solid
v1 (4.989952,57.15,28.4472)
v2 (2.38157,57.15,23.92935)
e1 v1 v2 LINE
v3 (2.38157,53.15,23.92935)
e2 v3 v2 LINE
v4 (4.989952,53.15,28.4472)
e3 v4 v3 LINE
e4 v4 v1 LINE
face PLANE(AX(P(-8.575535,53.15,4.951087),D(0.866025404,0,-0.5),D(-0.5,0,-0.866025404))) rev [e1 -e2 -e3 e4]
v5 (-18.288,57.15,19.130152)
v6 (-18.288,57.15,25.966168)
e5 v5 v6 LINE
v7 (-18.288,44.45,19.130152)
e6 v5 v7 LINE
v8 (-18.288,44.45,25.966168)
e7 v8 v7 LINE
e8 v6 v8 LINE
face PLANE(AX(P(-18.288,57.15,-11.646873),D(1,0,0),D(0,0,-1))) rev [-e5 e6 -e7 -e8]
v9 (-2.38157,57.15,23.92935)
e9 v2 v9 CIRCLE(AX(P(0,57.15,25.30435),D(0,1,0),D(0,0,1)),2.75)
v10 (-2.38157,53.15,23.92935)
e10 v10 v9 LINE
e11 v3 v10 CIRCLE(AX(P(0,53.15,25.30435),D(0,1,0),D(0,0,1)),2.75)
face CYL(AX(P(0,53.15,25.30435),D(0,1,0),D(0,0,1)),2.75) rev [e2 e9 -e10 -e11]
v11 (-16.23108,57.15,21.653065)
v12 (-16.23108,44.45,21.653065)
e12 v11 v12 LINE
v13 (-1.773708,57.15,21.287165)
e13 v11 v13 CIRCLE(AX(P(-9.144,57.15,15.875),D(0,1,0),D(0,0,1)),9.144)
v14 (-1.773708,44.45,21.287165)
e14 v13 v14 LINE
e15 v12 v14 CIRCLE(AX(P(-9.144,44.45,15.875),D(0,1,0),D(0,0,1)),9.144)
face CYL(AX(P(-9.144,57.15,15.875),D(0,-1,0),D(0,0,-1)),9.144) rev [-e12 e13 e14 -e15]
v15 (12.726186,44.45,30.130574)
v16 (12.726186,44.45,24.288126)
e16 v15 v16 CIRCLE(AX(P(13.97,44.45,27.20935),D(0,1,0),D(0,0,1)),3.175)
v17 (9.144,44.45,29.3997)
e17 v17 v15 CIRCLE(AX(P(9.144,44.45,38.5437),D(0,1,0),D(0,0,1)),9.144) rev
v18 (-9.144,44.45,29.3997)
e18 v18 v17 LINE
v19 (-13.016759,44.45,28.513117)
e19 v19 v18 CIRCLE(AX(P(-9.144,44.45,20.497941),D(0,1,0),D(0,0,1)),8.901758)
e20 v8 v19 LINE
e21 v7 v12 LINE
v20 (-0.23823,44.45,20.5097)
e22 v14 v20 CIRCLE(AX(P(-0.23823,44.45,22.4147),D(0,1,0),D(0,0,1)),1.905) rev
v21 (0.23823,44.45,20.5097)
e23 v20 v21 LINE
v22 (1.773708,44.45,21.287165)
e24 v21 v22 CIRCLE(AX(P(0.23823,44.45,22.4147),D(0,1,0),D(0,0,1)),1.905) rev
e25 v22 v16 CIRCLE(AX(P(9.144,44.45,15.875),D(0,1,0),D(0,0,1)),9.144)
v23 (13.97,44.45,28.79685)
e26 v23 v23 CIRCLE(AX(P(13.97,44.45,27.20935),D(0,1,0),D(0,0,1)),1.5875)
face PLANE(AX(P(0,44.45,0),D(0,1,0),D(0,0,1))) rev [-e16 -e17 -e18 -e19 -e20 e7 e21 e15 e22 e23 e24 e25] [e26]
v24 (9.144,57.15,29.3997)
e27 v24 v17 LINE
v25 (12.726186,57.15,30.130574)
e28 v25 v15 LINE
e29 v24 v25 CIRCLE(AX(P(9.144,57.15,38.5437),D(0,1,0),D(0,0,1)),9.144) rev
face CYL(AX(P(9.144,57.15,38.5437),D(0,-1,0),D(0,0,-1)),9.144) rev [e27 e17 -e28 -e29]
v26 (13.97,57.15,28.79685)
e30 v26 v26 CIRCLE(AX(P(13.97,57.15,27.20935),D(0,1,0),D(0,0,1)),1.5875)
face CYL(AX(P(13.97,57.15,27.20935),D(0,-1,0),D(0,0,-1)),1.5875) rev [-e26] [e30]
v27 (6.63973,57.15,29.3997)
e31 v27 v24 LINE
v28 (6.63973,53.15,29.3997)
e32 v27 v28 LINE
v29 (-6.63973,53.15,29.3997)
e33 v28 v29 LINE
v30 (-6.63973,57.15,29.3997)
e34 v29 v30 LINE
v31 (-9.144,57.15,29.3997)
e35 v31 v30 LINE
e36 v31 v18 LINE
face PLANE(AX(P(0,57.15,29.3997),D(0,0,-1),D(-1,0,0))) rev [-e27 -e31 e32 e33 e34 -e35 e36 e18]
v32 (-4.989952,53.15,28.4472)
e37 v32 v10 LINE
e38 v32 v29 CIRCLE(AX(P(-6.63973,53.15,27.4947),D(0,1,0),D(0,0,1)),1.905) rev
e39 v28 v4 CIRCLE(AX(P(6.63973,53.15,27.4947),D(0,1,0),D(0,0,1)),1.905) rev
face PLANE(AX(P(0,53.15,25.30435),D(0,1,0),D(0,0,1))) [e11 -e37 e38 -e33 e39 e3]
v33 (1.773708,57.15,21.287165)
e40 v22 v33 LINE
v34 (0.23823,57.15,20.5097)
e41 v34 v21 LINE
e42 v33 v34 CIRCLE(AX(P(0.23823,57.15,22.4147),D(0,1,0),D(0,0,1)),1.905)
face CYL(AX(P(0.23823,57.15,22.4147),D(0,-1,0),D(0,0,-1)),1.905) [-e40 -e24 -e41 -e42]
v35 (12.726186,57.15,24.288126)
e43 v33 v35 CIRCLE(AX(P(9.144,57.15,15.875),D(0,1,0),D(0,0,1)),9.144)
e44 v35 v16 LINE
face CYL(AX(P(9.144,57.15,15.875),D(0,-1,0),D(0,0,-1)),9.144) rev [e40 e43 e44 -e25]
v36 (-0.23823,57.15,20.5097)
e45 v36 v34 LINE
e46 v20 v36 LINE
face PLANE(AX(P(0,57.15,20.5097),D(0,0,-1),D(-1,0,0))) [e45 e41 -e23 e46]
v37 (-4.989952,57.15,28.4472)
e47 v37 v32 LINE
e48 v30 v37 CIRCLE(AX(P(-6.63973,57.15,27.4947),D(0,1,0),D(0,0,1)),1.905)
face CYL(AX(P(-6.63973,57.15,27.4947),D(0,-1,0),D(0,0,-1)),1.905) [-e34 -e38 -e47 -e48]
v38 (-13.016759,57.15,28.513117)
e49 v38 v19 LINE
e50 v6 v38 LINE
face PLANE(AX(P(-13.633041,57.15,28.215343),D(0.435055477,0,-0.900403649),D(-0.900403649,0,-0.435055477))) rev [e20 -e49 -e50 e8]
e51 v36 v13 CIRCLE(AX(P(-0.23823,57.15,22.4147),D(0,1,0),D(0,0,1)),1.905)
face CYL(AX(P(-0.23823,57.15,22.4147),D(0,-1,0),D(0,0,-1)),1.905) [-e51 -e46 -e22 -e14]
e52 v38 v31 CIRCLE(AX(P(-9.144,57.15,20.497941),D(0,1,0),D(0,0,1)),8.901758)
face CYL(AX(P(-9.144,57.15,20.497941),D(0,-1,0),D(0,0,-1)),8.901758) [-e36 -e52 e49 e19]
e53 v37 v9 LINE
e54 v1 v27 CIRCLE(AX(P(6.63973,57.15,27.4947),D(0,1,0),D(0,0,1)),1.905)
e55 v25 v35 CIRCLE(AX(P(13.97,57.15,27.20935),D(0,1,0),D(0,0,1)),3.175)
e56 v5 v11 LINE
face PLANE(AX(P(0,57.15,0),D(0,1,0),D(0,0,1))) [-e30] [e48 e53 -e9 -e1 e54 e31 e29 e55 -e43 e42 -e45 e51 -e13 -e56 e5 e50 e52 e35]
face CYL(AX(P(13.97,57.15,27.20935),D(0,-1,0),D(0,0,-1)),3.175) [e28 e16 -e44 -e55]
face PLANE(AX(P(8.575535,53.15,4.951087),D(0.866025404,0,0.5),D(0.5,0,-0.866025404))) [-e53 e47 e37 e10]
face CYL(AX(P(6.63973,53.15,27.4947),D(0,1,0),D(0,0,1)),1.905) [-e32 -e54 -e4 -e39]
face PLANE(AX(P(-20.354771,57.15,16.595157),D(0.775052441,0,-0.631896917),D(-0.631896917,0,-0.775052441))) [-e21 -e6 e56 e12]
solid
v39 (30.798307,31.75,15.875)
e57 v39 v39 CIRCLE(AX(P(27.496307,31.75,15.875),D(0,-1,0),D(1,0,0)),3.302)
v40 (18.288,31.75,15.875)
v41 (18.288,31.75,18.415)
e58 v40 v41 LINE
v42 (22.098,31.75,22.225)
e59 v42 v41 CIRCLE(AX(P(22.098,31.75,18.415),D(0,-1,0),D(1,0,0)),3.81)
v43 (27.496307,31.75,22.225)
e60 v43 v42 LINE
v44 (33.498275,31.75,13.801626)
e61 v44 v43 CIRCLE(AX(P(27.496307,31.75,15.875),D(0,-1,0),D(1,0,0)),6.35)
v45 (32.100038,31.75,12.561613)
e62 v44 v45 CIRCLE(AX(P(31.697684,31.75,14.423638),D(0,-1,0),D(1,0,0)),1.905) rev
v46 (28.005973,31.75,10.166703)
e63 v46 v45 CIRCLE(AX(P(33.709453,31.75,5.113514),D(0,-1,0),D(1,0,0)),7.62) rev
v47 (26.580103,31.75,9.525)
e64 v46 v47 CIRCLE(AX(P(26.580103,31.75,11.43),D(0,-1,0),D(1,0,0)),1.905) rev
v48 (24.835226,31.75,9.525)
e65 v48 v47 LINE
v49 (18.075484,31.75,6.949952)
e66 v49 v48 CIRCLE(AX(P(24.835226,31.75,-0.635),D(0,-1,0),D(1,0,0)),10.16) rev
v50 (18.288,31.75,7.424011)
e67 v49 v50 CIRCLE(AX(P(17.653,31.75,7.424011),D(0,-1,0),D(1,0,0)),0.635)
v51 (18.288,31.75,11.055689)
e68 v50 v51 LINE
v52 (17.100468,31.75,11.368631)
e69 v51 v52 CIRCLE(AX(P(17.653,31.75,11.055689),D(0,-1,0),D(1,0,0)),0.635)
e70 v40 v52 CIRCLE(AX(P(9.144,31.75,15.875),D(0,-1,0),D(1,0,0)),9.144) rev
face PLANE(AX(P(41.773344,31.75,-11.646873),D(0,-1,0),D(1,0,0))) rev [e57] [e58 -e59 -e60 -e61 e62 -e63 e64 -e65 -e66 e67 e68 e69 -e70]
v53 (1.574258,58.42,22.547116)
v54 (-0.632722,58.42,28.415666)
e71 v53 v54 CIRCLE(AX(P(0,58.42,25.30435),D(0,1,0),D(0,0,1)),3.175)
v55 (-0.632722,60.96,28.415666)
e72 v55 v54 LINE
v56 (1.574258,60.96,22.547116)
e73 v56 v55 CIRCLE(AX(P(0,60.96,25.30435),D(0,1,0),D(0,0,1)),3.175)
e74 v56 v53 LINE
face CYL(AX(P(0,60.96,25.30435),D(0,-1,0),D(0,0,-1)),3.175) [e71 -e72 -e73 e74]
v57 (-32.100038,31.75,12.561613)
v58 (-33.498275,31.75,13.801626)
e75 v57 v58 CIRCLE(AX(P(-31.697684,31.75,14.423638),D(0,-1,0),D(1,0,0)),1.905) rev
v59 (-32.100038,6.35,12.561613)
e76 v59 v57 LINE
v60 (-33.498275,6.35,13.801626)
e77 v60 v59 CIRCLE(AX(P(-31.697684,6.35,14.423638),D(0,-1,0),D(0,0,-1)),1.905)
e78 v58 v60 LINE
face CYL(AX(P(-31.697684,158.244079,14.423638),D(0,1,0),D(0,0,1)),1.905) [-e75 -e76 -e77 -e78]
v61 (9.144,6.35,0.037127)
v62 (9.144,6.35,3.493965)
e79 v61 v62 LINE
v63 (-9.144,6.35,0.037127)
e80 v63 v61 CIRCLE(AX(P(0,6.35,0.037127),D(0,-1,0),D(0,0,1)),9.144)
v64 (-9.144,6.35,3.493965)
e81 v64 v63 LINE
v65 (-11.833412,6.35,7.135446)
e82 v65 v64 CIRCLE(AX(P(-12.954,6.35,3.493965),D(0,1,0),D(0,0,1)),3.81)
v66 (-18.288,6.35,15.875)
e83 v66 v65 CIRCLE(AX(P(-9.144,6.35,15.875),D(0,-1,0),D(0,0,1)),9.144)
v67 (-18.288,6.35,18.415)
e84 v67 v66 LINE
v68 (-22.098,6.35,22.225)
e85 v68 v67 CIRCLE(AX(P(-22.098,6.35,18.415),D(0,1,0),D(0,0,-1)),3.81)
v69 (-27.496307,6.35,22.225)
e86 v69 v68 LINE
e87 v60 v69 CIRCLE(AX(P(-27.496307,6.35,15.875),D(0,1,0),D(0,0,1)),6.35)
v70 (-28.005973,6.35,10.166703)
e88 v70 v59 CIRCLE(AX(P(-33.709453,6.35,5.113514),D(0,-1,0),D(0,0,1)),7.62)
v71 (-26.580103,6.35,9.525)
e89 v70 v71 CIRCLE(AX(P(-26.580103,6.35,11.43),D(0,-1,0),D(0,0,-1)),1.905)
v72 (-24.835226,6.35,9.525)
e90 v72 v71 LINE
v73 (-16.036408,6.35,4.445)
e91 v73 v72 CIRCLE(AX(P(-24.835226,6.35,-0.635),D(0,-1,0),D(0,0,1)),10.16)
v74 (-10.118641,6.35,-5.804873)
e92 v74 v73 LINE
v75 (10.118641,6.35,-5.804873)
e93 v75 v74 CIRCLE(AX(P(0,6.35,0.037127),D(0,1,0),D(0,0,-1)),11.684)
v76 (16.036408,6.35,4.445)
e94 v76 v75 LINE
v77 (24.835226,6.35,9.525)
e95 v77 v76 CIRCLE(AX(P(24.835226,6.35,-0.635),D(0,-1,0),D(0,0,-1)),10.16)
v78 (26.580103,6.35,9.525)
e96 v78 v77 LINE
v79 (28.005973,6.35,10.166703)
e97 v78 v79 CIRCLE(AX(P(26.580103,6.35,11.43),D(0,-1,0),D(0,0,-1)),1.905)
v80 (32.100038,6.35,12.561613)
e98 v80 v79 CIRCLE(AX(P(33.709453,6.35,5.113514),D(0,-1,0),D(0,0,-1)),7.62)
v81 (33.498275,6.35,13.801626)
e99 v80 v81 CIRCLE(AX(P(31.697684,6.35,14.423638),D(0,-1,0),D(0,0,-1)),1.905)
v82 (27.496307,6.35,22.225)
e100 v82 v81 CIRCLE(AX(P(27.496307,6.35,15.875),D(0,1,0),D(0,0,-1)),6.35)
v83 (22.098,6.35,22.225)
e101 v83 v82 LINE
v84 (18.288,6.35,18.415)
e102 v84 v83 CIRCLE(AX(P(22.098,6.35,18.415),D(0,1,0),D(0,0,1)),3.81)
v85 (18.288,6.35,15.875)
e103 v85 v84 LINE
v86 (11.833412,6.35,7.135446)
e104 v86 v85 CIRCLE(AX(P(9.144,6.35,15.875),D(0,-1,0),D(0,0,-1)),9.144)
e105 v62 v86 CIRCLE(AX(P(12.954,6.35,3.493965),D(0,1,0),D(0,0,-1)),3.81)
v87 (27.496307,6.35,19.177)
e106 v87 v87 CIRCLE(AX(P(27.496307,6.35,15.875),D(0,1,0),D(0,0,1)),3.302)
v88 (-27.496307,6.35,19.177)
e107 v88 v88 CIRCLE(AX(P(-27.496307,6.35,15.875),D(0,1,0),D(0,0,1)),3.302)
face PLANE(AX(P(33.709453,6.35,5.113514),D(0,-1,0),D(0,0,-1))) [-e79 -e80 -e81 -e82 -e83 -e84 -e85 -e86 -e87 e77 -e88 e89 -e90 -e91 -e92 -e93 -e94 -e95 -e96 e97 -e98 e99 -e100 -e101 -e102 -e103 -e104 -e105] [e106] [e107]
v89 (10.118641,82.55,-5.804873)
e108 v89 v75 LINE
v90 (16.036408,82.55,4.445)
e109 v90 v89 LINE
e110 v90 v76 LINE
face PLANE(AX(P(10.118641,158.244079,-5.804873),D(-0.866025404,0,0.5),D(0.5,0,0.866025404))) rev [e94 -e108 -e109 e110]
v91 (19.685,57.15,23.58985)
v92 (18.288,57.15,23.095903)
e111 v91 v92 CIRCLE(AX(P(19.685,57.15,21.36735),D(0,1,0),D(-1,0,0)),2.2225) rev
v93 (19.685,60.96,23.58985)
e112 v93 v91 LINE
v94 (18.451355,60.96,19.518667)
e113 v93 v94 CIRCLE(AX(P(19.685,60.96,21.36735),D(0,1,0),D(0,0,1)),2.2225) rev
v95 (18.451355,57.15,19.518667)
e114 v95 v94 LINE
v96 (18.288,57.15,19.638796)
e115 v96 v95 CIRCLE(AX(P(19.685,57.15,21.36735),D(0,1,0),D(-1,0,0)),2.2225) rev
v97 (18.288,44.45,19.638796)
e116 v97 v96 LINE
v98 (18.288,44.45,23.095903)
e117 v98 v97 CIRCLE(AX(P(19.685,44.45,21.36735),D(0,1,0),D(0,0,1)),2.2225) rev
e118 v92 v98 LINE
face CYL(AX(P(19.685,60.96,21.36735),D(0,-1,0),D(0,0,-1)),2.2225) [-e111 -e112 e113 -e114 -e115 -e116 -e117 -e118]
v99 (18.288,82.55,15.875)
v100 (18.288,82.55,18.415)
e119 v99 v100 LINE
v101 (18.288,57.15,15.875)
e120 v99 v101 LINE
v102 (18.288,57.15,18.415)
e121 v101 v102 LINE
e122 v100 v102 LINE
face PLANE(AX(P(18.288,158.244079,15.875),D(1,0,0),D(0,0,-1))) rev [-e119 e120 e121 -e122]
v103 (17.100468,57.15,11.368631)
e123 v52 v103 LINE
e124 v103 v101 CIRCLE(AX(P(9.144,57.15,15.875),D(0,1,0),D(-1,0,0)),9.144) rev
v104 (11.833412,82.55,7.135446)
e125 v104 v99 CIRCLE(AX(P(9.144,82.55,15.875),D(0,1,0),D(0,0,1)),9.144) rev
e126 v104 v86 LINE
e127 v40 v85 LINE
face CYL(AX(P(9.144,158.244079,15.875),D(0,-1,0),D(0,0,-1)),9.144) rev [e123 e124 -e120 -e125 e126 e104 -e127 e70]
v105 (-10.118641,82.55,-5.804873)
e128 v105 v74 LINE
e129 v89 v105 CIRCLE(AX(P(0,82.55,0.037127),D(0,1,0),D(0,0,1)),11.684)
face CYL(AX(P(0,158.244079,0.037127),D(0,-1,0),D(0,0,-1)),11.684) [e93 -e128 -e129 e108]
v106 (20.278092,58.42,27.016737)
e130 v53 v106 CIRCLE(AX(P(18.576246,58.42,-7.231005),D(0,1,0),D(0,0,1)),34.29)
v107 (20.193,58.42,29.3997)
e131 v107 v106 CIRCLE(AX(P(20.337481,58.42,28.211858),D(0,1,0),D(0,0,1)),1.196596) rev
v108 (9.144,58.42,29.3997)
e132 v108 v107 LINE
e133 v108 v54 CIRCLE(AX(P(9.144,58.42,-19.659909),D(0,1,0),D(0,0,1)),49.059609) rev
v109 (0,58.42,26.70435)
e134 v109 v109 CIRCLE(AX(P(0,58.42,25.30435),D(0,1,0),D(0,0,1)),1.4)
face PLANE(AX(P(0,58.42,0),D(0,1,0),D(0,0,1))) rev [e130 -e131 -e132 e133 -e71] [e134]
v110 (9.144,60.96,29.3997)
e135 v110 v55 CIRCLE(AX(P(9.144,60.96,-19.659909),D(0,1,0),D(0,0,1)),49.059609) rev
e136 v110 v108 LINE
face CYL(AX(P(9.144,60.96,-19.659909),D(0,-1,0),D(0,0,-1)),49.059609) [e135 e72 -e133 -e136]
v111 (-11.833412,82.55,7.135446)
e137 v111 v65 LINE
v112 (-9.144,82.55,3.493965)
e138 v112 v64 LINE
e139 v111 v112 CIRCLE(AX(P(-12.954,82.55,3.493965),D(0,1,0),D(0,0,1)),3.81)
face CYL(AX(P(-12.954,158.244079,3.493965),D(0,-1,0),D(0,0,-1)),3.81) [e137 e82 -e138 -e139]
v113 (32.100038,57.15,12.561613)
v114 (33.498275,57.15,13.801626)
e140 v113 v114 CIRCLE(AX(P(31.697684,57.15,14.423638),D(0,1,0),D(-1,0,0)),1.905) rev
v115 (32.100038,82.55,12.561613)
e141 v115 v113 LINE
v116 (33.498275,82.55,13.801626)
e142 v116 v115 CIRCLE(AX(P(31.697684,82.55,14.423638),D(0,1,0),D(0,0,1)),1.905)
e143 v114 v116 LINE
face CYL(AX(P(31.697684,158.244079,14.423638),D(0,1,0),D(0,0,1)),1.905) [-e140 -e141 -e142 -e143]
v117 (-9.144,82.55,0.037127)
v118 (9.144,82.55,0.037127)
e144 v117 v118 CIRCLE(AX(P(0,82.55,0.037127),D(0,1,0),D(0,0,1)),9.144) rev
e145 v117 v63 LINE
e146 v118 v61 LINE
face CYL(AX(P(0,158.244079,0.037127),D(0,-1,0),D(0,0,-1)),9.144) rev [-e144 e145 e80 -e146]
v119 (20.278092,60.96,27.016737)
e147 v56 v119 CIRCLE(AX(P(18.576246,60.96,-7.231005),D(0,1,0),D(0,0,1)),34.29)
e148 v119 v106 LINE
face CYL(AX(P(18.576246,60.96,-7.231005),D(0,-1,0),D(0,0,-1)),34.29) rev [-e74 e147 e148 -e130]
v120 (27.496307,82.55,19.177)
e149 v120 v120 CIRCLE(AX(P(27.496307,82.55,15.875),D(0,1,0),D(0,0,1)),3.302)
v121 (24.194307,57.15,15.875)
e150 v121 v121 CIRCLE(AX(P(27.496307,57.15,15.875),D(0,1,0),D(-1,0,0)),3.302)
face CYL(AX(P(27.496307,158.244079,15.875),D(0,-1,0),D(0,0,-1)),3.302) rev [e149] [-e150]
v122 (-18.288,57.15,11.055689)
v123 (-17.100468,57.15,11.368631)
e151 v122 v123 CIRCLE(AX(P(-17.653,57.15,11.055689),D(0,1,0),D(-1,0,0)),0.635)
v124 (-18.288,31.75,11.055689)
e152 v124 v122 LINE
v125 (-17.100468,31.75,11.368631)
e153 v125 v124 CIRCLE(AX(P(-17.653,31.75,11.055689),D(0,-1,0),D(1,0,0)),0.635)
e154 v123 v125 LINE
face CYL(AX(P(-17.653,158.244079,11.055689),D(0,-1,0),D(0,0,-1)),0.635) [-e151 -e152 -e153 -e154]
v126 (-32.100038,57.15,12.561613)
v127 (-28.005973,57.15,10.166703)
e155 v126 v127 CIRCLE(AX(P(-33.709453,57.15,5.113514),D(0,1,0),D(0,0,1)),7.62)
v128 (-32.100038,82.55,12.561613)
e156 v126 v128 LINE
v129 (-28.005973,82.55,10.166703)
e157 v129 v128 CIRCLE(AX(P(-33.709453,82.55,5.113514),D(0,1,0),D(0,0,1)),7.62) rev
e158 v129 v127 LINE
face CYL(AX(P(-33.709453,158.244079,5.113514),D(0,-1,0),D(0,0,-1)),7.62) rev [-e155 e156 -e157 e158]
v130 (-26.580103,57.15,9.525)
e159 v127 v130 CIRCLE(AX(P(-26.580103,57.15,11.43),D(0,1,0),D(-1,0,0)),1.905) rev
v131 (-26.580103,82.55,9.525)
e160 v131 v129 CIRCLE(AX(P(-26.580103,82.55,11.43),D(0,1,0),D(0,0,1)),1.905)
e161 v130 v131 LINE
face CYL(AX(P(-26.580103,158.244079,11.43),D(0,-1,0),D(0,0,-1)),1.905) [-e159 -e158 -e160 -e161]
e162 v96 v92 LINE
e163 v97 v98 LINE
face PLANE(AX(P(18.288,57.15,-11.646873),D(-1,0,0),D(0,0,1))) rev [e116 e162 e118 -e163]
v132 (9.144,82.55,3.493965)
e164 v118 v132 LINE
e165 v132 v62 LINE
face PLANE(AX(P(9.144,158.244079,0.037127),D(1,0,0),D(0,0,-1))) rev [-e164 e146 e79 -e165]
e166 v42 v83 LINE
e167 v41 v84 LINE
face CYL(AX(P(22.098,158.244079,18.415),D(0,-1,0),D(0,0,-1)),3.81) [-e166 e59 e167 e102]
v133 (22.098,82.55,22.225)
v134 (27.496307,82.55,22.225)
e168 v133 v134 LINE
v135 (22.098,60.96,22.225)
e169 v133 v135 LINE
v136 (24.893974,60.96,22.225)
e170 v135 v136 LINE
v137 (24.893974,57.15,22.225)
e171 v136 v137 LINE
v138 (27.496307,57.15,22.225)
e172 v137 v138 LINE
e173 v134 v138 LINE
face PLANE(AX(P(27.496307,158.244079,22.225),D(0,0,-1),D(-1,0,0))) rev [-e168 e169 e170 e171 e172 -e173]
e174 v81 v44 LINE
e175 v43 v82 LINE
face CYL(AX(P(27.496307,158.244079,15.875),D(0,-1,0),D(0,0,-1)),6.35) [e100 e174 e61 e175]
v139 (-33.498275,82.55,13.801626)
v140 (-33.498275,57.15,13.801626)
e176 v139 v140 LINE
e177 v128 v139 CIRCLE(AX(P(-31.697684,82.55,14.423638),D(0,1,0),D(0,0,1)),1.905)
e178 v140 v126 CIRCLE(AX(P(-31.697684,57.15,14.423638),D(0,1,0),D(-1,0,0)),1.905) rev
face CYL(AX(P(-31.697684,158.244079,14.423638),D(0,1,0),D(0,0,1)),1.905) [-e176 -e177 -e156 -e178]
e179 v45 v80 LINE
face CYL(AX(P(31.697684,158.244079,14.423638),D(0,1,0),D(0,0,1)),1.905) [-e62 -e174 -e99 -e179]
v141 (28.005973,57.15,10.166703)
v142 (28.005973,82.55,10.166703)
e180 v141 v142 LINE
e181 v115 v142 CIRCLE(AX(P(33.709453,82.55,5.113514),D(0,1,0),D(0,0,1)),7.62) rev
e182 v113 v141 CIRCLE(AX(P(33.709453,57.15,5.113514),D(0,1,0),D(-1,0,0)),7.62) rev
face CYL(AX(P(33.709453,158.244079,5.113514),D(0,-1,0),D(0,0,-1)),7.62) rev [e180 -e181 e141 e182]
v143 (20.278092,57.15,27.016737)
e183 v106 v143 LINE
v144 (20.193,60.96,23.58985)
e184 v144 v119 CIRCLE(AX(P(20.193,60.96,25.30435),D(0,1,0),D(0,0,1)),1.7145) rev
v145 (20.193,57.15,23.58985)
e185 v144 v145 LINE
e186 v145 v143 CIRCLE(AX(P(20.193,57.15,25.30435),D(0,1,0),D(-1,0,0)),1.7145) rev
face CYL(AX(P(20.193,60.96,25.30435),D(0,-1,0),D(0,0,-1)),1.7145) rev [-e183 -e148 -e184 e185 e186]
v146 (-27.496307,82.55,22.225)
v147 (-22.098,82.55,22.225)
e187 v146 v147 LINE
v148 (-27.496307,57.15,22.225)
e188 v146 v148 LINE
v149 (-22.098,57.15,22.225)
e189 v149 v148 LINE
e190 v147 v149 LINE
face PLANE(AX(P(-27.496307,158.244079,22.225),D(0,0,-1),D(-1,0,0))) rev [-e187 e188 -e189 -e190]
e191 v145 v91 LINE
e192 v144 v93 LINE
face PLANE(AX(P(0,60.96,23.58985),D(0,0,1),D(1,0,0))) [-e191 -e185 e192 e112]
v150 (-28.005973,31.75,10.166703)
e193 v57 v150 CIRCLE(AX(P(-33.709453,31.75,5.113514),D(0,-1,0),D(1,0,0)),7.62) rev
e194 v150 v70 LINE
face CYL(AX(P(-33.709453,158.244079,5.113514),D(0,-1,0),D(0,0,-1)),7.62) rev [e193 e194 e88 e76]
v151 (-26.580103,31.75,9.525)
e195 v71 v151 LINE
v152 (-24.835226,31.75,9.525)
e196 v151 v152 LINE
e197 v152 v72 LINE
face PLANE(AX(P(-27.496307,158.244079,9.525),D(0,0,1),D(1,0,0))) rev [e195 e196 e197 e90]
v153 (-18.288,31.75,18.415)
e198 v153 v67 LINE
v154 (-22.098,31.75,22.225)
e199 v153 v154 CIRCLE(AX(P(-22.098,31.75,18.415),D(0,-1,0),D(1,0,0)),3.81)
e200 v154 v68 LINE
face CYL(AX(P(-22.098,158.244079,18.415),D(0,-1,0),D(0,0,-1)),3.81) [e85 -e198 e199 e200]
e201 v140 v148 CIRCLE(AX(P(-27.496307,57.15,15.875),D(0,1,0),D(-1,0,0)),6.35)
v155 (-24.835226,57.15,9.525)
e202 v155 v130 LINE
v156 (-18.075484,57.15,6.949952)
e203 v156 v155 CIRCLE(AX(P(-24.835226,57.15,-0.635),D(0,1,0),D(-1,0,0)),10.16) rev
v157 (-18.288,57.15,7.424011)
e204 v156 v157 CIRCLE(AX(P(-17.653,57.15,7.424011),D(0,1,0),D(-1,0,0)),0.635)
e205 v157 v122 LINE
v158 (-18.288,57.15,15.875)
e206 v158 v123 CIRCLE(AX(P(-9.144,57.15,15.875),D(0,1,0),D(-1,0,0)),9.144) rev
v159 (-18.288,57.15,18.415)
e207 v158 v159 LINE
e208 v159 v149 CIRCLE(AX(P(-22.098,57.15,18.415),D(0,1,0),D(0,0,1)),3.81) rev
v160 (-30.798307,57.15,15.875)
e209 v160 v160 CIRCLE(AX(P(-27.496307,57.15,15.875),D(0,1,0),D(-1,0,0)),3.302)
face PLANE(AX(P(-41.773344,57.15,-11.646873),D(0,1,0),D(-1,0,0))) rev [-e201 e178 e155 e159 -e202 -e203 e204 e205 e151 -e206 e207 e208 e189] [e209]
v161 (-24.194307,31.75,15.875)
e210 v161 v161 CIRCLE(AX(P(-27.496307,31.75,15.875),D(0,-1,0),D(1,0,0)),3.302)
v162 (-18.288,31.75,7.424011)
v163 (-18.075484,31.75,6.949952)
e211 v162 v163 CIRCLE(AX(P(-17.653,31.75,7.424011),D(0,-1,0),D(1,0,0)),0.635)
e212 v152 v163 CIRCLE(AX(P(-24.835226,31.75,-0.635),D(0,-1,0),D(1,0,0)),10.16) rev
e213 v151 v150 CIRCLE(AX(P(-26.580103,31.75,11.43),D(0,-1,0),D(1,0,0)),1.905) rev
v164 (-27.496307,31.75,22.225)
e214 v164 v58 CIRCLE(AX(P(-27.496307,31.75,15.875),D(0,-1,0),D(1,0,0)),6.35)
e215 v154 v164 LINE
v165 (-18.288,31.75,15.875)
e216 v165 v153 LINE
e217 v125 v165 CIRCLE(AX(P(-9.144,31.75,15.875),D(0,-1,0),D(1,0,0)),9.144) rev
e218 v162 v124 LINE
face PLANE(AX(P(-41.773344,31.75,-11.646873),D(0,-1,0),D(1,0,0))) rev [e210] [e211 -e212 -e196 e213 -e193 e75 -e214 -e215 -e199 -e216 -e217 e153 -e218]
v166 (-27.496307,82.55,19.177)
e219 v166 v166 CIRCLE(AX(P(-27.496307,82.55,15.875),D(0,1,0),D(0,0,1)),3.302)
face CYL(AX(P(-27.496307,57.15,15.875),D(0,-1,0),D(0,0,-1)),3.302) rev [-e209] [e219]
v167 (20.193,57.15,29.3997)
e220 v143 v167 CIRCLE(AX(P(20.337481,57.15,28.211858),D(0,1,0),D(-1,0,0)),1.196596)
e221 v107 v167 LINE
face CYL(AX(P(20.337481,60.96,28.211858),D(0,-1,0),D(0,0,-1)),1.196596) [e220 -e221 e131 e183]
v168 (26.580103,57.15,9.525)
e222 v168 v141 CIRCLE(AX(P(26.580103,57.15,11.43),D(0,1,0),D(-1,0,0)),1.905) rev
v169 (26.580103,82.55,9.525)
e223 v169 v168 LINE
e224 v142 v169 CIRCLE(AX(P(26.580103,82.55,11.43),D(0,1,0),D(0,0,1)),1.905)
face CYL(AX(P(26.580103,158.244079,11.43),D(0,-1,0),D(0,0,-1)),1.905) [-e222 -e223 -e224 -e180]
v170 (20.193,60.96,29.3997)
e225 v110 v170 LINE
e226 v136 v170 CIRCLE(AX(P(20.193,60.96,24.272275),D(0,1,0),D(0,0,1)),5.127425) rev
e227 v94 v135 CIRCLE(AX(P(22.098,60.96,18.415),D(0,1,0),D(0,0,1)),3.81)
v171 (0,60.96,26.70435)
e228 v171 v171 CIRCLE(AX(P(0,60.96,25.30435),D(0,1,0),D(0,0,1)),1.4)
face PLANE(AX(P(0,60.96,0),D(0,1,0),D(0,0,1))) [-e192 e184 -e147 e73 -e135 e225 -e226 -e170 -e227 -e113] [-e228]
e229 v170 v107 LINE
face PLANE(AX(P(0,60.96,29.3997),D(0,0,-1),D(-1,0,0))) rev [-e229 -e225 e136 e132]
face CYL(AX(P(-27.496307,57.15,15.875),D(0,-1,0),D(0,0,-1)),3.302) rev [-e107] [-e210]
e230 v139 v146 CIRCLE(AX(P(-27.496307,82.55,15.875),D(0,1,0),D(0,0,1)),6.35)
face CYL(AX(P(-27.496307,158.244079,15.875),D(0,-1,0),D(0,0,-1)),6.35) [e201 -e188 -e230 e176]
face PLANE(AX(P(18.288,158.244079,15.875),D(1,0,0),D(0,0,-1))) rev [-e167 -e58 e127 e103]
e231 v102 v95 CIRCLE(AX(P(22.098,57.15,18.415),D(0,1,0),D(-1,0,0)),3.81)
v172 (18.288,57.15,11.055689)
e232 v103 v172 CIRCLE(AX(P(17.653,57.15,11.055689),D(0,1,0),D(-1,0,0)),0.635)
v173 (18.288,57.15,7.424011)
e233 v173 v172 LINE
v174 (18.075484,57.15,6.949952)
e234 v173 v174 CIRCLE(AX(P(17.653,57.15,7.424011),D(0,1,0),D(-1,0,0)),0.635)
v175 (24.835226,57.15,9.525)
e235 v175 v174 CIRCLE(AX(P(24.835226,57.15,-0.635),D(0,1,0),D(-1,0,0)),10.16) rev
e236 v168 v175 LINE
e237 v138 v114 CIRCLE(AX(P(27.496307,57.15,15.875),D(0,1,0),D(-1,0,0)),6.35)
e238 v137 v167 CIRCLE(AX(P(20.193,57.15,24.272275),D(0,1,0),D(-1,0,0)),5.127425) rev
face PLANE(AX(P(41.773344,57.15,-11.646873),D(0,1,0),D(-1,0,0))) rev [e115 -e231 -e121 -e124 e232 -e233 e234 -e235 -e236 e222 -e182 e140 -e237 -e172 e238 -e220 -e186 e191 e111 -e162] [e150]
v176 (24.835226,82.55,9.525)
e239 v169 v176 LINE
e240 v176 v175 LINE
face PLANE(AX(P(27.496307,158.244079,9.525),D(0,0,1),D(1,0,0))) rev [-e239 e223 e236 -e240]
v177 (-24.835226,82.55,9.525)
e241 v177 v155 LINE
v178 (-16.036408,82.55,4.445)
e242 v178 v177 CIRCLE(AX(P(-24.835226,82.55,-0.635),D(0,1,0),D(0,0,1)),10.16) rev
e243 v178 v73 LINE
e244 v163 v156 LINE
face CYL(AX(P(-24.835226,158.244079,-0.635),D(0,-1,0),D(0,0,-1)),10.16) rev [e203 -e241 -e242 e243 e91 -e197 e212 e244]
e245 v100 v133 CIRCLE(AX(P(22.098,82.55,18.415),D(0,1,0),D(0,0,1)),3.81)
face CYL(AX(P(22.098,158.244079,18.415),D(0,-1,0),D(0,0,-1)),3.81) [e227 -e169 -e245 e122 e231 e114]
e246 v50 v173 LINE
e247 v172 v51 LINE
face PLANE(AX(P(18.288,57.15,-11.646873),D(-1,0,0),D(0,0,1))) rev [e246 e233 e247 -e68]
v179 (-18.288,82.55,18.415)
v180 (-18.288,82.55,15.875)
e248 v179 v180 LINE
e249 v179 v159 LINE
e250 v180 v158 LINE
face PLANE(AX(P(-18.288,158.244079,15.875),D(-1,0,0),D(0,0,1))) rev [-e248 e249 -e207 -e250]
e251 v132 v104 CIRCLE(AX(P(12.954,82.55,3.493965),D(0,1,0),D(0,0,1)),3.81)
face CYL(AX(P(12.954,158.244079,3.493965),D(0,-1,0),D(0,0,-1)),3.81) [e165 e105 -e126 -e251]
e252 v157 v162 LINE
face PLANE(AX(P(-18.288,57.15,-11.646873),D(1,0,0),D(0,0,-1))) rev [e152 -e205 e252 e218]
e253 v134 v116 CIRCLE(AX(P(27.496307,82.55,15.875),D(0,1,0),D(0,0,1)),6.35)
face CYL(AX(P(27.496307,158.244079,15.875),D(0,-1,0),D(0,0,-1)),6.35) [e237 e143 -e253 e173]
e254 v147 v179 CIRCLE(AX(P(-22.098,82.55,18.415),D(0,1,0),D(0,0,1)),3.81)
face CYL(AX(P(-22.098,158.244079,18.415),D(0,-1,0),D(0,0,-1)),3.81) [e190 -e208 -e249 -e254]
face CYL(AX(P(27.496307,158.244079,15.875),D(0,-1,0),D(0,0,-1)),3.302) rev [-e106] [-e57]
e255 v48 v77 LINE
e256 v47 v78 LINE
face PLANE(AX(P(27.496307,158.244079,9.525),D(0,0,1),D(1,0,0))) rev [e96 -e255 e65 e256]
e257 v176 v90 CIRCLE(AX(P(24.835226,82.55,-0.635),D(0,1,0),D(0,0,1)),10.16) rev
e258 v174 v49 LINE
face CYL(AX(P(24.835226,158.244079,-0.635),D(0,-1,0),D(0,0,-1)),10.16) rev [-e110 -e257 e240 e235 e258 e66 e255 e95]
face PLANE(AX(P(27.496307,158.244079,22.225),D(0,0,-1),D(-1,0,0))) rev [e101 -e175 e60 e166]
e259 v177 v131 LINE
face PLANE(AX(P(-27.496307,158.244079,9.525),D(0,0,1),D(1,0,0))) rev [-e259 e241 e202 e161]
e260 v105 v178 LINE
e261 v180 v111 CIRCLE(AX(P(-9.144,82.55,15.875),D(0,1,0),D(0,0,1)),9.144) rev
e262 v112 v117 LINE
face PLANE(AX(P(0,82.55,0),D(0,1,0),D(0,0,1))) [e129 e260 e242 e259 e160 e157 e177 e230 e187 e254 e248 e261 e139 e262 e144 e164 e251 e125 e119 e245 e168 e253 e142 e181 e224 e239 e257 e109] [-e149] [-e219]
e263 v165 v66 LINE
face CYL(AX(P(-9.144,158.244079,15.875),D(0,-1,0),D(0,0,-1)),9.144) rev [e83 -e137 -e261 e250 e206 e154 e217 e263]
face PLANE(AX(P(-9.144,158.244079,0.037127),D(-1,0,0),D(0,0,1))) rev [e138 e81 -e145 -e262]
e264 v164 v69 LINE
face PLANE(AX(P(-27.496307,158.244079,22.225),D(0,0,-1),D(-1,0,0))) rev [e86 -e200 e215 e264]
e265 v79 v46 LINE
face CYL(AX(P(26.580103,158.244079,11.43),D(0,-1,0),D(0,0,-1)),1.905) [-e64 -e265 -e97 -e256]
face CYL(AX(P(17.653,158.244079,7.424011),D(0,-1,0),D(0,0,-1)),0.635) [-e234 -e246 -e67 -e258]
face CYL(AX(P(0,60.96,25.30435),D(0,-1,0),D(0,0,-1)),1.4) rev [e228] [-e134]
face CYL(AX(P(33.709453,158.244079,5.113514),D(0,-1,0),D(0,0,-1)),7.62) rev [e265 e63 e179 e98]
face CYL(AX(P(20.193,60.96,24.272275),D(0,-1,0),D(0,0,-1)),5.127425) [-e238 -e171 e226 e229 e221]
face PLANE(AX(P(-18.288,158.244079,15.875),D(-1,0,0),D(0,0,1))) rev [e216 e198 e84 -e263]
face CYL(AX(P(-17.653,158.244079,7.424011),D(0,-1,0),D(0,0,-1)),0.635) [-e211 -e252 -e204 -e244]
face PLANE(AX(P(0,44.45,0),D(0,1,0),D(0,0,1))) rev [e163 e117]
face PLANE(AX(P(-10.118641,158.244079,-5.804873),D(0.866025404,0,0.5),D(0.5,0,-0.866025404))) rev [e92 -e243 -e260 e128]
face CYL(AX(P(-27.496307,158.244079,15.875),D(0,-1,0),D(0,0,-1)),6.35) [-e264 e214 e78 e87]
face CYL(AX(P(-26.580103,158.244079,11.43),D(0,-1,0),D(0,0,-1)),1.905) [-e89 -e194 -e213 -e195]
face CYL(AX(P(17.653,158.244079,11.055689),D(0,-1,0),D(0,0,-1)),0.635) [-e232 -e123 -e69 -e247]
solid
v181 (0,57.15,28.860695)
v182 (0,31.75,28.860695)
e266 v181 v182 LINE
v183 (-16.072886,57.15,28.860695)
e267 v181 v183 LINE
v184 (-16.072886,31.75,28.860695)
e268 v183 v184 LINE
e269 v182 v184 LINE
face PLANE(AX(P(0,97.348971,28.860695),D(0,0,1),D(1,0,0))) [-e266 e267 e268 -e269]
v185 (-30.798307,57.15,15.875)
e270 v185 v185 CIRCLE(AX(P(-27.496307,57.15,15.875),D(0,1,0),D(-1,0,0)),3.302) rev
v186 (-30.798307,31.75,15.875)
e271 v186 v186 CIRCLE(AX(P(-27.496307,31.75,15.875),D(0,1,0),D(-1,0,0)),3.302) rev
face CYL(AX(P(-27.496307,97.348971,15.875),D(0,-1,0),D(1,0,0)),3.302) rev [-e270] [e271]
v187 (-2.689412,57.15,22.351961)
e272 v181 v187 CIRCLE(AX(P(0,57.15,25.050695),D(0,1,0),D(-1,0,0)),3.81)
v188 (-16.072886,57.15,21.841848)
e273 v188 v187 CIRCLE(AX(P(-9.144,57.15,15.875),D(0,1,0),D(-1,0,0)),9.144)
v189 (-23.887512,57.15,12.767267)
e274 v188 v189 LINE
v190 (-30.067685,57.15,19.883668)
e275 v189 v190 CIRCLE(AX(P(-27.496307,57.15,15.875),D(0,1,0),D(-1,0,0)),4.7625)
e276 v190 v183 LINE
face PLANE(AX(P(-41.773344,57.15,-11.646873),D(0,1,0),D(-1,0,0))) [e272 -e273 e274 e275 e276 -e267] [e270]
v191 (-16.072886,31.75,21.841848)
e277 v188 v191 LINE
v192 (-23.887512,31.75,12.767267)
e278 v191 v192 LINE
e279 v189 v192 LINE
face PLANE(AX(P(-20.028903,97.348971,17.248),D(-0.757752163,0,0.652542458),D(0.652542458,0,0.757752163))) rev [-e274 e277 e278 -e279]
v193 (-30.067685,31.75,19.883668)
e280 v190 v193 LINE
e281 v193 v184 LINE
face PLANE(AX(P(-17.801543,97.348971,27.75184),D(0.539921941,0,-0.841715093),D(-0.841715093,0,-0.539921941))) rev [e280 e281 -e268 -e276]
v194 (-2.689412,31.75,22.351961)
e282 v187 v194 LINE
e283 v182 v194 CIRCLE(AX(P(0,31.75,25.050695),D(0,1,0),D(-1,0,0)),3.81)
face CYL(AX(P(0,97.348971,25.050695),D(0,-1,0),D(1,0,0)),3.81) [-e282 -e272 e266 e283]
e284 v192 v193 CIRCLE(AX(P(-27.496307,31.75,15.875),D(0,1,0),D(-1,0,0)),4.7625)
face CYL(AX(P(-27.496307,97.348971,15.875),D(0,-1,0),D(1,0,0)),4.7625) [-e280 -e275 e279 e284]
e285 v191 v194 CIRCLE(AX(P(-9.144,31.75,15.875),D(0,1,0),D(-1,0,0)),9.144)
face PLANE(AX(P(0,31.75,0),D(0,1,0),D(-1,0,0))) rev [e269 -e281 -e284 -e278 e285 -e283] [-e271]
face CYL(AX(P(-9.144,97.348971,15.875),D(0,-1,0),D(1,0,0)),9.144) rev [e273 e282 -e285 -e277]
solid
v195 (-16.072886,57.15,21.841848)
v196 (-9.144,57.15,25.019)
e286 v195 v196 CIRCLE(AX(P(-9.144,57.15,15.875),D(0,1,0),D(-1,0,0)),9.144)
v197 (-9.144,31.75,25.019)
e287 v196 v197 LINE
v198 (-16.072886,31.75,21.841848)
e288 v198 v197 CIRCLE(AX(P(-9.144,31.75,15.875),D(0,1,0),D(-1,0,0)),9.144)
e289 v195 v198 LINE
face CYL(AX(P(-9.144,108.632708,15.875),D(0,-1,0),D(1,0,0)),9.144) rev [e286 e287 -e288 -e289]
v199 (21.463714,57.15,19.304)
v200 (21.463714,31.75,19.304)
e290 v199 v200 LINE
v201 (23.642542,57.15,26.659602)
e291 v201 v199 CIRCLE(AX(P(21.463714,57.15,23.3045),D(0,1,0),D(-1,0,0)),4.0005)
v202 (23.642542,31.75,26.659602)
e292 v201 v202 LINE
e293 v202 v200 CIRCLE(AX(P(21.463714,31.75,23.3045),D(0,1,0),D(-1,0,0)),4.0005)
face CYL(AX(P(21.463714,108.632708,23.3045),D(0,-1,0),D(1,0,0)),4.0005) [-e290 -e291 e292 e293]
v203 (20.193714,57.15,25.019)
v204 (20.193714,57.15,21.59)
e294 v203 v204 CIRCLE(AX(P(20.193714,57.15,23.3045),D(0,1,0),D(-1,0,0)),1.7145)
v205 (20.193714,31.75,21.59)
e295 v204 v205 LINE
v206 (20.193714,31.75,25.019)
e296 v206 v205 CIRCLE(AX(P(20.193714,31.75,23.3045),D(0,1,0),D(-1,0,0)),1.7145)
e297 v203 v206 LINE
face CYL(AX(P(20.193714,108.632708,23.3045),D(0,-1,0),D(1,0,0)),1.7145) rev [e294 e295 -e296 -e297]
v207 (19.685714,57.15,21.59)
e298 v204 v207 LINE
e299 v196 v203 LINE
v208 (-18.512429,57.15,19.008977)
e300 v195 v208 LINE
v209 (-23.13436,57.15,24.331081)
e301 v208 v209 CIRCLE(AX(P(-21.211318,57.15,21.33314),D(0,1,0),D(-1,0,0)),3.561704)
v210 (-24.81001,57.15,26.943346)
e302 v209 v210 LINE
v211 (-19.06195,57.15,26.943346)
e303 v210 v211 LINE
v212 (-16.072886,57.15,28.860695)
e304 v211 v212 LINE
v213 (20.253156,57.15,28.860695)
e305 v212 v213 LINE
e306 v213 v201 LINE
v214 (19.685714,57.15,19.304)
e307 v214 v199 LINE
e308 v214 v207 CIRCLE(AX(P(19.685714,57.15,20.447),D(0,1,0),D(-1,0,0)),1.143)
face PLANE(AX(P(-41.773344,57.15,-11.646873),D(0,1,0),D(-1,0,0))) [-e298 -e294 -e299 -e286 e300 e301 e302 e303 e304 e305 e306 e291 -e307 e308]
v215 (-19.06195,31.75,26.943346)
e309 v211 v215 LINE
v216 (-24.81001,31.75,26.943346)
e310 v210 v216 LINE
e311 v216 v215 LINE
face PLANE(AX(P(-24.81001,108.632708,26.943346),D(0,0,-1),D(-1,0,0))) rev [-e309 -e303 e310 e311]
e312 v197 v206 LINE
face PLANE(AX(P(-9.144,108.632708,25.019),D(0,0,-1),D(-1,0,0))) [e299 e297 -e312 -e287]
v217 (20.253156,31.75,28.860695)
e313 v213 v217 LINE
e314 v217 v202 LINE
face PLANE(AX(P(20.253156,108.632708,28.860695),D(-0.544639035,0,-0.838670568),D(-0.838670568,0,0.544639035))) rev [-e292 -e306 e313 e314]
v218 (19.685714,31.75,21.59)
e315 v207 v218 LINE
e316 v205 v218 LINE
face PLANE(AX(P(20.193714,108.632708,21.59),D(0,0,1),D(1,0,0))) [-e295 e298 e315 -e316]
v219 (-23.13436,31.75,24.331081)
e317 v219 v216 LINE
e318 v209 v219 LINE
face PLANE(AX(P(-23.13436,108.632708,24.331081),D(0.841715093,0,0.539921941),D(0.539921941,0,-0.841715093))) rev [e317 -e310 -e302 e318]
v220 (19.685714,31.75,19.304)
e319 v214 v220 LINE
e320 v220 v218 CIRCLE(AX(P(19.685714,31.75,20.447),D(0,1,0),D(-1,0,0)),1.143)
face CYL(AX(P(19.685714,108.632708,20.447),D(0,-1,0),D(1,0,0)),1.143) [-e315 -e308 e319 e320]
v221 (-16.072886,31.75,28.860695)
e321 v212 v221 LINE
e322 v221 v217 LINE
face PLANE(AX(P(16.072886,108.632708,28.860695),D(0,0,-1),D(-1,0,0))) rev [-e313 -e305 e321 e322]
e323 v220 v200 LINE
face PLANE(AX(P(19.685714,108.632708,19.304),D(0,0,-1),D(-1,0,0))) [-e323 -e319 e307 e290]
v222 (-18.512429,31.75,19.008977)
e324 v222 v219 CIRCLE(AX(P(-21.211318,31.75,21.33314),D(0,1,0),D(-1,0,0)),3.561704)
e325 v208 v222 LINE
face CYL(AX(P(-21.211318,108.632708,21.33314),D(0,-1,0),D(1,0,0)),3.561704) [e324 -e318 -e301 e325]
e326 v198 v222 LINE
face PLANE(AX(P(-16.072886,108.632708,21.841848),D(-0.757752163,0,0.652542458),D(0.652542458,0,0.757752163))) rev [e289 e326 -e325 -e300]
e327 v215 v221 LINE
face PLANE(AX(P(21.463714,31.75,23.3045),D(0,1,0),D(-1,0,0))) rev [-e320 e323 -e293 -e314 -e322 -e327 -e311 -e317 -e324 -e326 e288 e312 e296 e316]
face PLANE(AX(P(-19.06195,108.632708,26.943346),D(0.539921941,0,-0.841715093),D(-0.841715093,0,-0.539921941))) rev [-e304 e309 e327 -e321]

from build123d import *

# Parameters (mm, degrees)
SKETCH19_R              = 3.302
SKETCH19_R_2            = 1.5875
BOSS_EXTRUDE4_DEPTH     = 12.7
CUT_EXTRUDE2_START      = 12.7
CUT_EXTRUDE2_DEPTH      = 4
BOSS_EXTRUDE5_START     = 13.97
SKETCH20_R              = 1.4
BOSS_EXTRUDE5_DEPTH     = 2.54
BOSS_EXTRUDE6_REACH     = 49.508
FILLET3_R               = 1.905
SKETCH9_R               = 3.302
BOSS_EXTRUDE1_DEPTH     = 76.2
FILLET2_R               = 1.905
CUT_EXTRUDE1_DEPTH      = 95.251173486
CUT_EXTRUDE1_DEPTH_BACK = 95.251173486
SKETCH11_W              = 23.485343907
SKETCH11_H              = 25.4
FILLET1_START           = 31.75
FILLET1_DEPTH           = 25.4
SKETCH16_R              = 3.302
BOSS_EXTRUDE2_DEPTH     = 25.4
BOSS_EXTRUDE3_DEPTH     = 25.4


with BuildPart() as part:
    # Sketch19 → Boss-Extrude4 (new body)
    with BuildSketch(Plane(origin=(0, 44.45, 0), x_dir=(1, 0, 0), z_dir=(0, 1, 0))):
        with BuildLine():
            Line((-29.706388395, -20.449050539), (-13.016758738, -28.513116917))
            ThreePointArc((-13.016758738, -28.513116917), (-11.130472315, -29.175223594), (-9.144, -29.399699566))
            Line((-9.144, -29.399699566), (9.144, -29.399699566))
            ThreePointArc((9.144, -29.399699566), (10.971992807, -29.584281153), (12.726185567, -30.130573954))
            ThreePointArc((12.726185567, -30.130573954), (17.145, -27.209349783), (12.726185567, -24.288125612))
            ThreePointArc((12.726185567, -24.288125612), (6.281816233, -24.559505748), (1.261595802, -20.509699566))
            Line((1.261595802, -20.509699566), (-1.261595802, -20.509699566))
            ThreePointArc((-1.261595802, -20.509699566), (-8.447611674, -24.992443682), (-16.231079518, -21.653065412))
            Line((-16.231079518, -21.653065412), (-23.559040171, -12.66496366))
            ThreePointArc((-23.559040171, -12.66496366), (-31.483008687, -12.726570832), (-29.706388395, -20.449050539))
        make_face()
        with Locations(Location((-27.49630657, -15.875, 0), (0, 0, 270))):
            Circle(SKETCH19_R, mode=Mode.SUBTRACT)
        with Locations(Location((13.97, -27.209349783, 0), (0, 0, 270))):
            Circle(SKETCH19_R_2, mode=Mode.SUBTRACT)
    extrude(amount=BOSS_EXTRUDE4_DEPTH)

    # Sketch19<3> → Cut-Extrude2 (cut)
    with BuildSketch(Plane(origin=(0, 44.45, 0), x_dir=(1, 0, 0), z_dir=(0, 1, 0)).offset(CUT_EXTRUDE2_START)):
        with BuildLine():
            Line((-2.38156986, -23.929349783), (-5.53987778, -29.399699566))
            Line((-5.53987778, -29.399699566), (5.53987778, -29.399699566))
            Line((5.53987778, -29.399699566), (2.38156986, -23.929349783))
            ThreePointArc((2.38156986, -23.929349783), (0, -22.554349783), (-2.38156986, -23.929349783))
        make_face()
    extrude(amount=-CUT_EXTRUDE2_DEPTH, mode=Mode.SUBTRACT)

    # Fillet3
    fillet3_edges = [part.edges().sort_by_distance(p)[0] for p in [
        (-1.261595802, 50.8, 20.509699566),
        (1.261595802, 50.8, 20.509699566),
        (5.53987778, 55.15, 29.399699566),
        (-5.53987778, 55.15, 29.399699566),
    ]]
    fillet(fillet3_edges, radius=FILLET3_R)



with BuildPart() as body_2:
    # Sketch20 → Boss-Extrude5 (new body)
    # profile 1 of 2: a face of its own
    with BuildSketch(Plane(origin=(0, 44.45, 0), x_dir=(1, 0, 0), z_dir=(0, 1, 0)).offset(BOSS_EXTRUDE5_START)):
        with BuildLine():
            ThreePointArc((20.278092312, -27.016736874), (19.141646765, -28.169156581), (20.193, -29.399699566))
            Line((20.193, -29.399699566), (9.144, -29.399699566))
            ThreePointArc((9.144, -29.399699566), (4.230940498, -29.153071232), (-0.632721967, -28.415665889))
            ThreePointArc((-0.632721967, -28.415665889), (-2.971799298, -24.186747917), (1.574258141, -22.547116332))
            ThreePointArc((1.574258141, -22.547116332), (10.60643046, -26.119949156), (20.278092312, -27.016736874))
        make_face()
        with Locations(Location((0, -25.304349783, 0), (0, 0, 270))):
            Circle(SKETCH20_R, mode=Mode.SUBTRACT)
    # profile 2 of 2: a face of its own
    with BuildSketch(Plane(origin=(0, 44.45, 0), x_dir=(1, 0, 0), z_dir=(0, 1, 0)).offset(BOSS_EXTRUDE5_START)):
        with BuildLine():
            ThreePointArc((20.193, -23.589849783), (21.906971691, -25.261790512), (20.278092312, -27.016736874))
            ThreePointArc((20.278092312, -27.016736874), (19.141646765, -28.169156581), (20.193, -29.399699566))
            ThreePointArc((20.193, -29.399699566), (25.320424891, -24.272274674), (20.193, -19.144849783))
            Line((20.193, -19.144849783), (19.685, -19.144849783))
            ThreePointArc((19.685, -19.144849783), (17.4625, -21.367349783), (19.685, -23.589849783))
            Line((19.685, -23.589849783), (20.193, -23.589849783))
        make_face()
    extrude(amount=BOSS_EXTRUDE5_DEPTH)

    # Sketch20<3> → Boss-Extrude6 (add, up to next)
    with BuildSketch(Plane(origin=(0, 44.45, 0), x_dir=(1, 0, 0), z_dir=(0, 1, 0)), mode=Mode.PRIVATE) as boss_extrude6_sk1:
        with BuildLine():
            ThreePointArc((20.193, -23.589849783), (21.906971691, -25.261790512), (20.278092312, -27.016736874))
            ThreePointArc((20.278092312, -27.016736874), (19.141646765, -28.169156581), (20.193, -29.399699566))
            ThreePointArc((20.193, -29.399699566), (25.320424891, -24.272274674), (20.193, -19.144849783))
            Line((20.193, -19.144849783), (19.685, -19.144849783))
            ThreePointArc((19.685, -19.144849783), (17.4625, -21.367349783), (19.685, -23.589849783))
            Line((19.685, -23.589849783), (20.193, -23.589849783))
        make_face()
    boss_extrude6_tool1 = extrude(boss_extrude6_sk1.sketch, amount=BOSS_EXTRUDE6_REACH, mode=Mode.PRIVATE) - body_2.part
    add(boss_extrude6_tool1.solids().sort_by_distance((21.712164, 44.45, 23.729838))[0])


with BuildPart() as part_1:
    add(part.part)

    add(body_2.part)  # Boss-Extrude1 merges body 2
    # Sketch9 → Boss-Extrude1 (add)
    with BuildSketch(Plane(origin=(0, 6.35, 0), x_dir=(1, 0, 0), z_dir=(0, 1, 0))):
        with BuildLine():
            Line((-9.144, -0.037127416), (-9.144, -3.493965471))
            ThreePointArc((-9.144, -3.493965471), (-9.88923727, -5.757442755), (-11.833411765, -7.135446215))
            ThreePointArc((-11.833411765, -7.135446215), (-16.499430551, -10.44265452), (-18.288, -15.875))
            Line((-18.288, -15.875), (-18.288, -18.415))
            ThreePointArc((-18.288, -18.415), (-19.403923164, -21.109076836), (-22.098, -22.225))
            Line((-22.098, -22.225), (-27.49630657, -22.225))
            ThreePointArc((-27.49630657, -22.225), (-32.995567884, -19.05), (-32.995567884, -12.7))
            ThreePointArc((-32.995567884, -12.7), (-29.899453324, -11.712627725), (-27.49630657, -9.525))
            Line((-27.49630657, -9.525), (-24.835225616, -9.525))
            ThreePointArc((-24.835225616, -9.525), (-19.755225616, -8.163818102), (-16.036407514, -4.445))
            Line((-16.036407514, -4.445), (-10.118640818, 5.804872584))
            ThreePointArc((-10.118640818, 5.804872584), (0, 11.646872584), (10.118640818, 5.804872584))
            Line((10.118640818, 5.804872584), (16.036407514, -4.445))
            ThreePointArc((16.036407514, -4.445), (19.755225616, -8.163818102), (24.835225616, -9.525))
            Line((24.835225616, -9.525), (27.49630657, -9.525))
            ThreePointArc((27.49630657, -9.525), (29.899453324, -11.712627725), (32.995567884, -12.7))
            ThreePointArc((32.995567884, -12.7), (32.995567884, -19.05), (27.49630657, -22.225))
            Line((27.49630657, -22.225), (22.098, -22.225))
            ThreePointArc((22.098, -22.225), (19.403923164, -21.109076836), (18.288, -18.415))
            Line((18.288, -18.415), (18.288, -15.875))
            ThreePointArc((18.288, -15.875), (16.499430551, -10.44265452), (11.833411765, -7.135446215))
            ThreePointArc((11.833411765, -7.135446215), (9.88923727, -5.757442755), (9.144, -3.493965471))
            Line((9.144, -3.493965471), (9.144, -0.037127416))
            ThreePointArc((9.144, -0.037127416), (0, 9.106872584), (-9.144, -0.037127416))
        make_face()
        with Locations(Location((27.49630657, -15.875, 0), (0, 0, 270))):
            Circle(SKETCH9_R, mode=Mode.SUBTRACT)
        with Locations(Location((-27.49630657, -15.875, 0), (0, 0, 270))):
            Circle(SKETCH9_R, mode=Mode.SUBTRACT)
    extrude(amount=BOSS_EXTRUDE1_DEPTH)

    # Fillet2
    fillet2_edges = [part_1.edges().sort_by_distance(p)[0] for p in [
        (-32.995567884, 44.45, 12.7),
        (-27.49630657, 44.45, 9.525),
        (27.49630657, 44.45, 9.525),
        (32.995567884, 44.45, 12.7),
    ]]
    fillet(fillet2_edges, radius=FILLET2_R)

    # Sketch11 → Cut-Extrude1 (cut, two sides: drawn at the far end of the back side and taken through both)
    with BuildSketch(Plane.XY.offset(-CUT_EXTRUDE1_DEPTH_BACK)):
        with Locations((-30.030671954, 44.45)):
            Rectangle(SKETCH11_W, SKETCH11_H)
        with Locations((30.030671954, 44.45)):
            Rectangle(SKETCH11_W, SKETCH11_H)
    extrude(amount=CUT_EXTRUDE1_DEPTH + CUT_EXTRUDE1_DEPTH_BACK, mode=Mode.SUBTRACT)


with BuildPart() as cut_extrude1_piece_1:
    # of the separate pieces the step leaves, piece 1, a body of its own (cut_extrude1_pieces)
    add(part_1.part.solids().sort_by_distance((-33.498274605, 6.35, 13.801626009))[0])

    # Fillet1: read off the stored shape, not the designer's step
    # Fillet1 outline → Fillet1 (cut)
    with BuildSketch(Plane(origin=(0, 0, 0), x_dir=(1, 0, 0), z_dir=(0, 1, 0)).offset(FILLET1_START)):
        with BuildLine():
            Line((-18.288, -7.134133589), (-18.288, -7.424011118))
            ThreePointArc((-18.288, -7.424011118), (-18.232440355, -7.16425378), (-18.07548386, -6.94995164))
            ThreePointArc((-18.07548386, -6.94995164), (-18.181104644, -7.042777939), (-18.288, -7.134133589))
        make_face()
        with BuildLine():
            ThreePointArc((-17.100467532, -11.368631129), (-17.814812983, -11.669725944), (-18.288, -11.055688846))
            Line((-18.288, -11.055688846), (-18.288, -15.875))
            ThreePointArc((-18.288, -15.875), (-17.98613422, -13.544893041), (-17.100467532, -11.368631129))
        make_face()
        with BuildLine():
            ThreePointArc((18.288, -7.134133589), (18.181104644, -7.042777939), (18.07548386, -6.94995164))
            ThreePointArc((18.07548386, -6.94995164), (18.232440355, -7.16425378), (18.288, -7.424011118))
            Line((18.288, -7.424011118), (18.288, -7.134133589))
        make_face()
        with BuildLine():
            Line((18.288, -15.875), (18.288, -11.055688846))
            ThreePointArc((18.288, -11.055688846), (17.814812983, -11.669725944), (17.100467532, -11.368631129))
            ThreePointArc((17.100467532, -11.368631129), (17.98613422, -13.544893041), (18.288, -15.875))
        make_face()
    extrude(amount=FILLET1_DEPTH, mode=Mode.SUBTRACT)


with BuildPart() as cut_extrude1_piece_2:
    # of the separate pieces the step leaves, piece 2, a body of its own (cut_extrude1_pieces)
    add(part_1.part.solids().sort_by_distance((-18.288, 44.45, 25.966167685))[0])


with BuildPart() as body_3:
    # Sketch16 → Boss-Extrude2 (new body)
    # profile 1 of 2: a face of its own
    with BuildSketch(Plane(origin=(0, 31.75, 0), x_dir=(1, 0, 0), z_dir=(0, 1, 0))):
        with BuildLine():
            ThreePointArc((-22.098, -22.225), (-19.689367279, -21.367048173), (-18.365506655, -19.179587096))
            Line((-18.365506655, -19.179587096), (-23.887511894, -12.767266544))
            ThreePointArc((-23.887511894, -12.767266544), (-31.092116784, -12.752251986), (-30.067684815, -19.883668129))
            Line((-30.067684815, -19.883668129), (-26.417649093, -22.225))
            Line((-26.417649093, -22.225), (-22.098, -22.225))
        make_face()
        with Locations(Location((-27.49630657, -15.875, 0), (0, 0, 180))):
            Circle(SKETCH16_R, mode=Mode.SUBTRACT)
    # profile 2 of 2: a face of its own
    with BuildSketch(Plane(origin=(0, 31.75, 0), x_dir=(1, 0, 0), z_dir=(0, 1, 0))):
        with BuildLine():
            ThreePointArc((-2.689411765, -22.351961225), (-9.492271956, -25.012365192), (-16.072885779, -21.841848236))
            Line((-16.072885779, -21.841848236), (-18.365506655, -19.179587096))
            ThreePointArc((-18.365506655, -19.179587096), (-19.689367279, -21.367048173), (-22.098, -22.225))
            Line((-22.098, -22.225), (-26.417649093, -22.225))
            Line((-26.417649093, -22.225), (-16.072885779, -28.860695069))
            Line((-16.072885779, -28.860695069), (0, -28.860695069))
            ThreePointArc((0, -28.860695069), (3.521240971, -23.595716709), (-2.689411765, -22.351961225))
        make_face()
    extrude(amount=BOSS_EXTRUDE2_DEPTH)


with BuildPart() as body_4:
    # Sketch17 → Boss-Extrude3 (new body)
    with BuildSketch(Plane(origin=(0, 31.75, 0), x_dir=(1, 0, 0), z_dir=(0, 1, 0))):
        with BuildLine():
            Line((-19.061950135, -26.943346261), (-16.072885779, -28.860695069))
            Line((-16.072885779, -28.860695069), (16.072885779, -28.860695069))
            Line((16.072885779, -28.860695069), (20.253155768, -28.860695069))
            Line((20.253155768, -28.860695069), (23.642542472, -26.659601607))
            ThreePointArc((23.642542472, -26.659601607), (25.299472362, -22.168296614), (21.463714012, -19.304))
            Line((21.463714012, -19.304), (19.685714012, -19.304))
            ThreePointArc((19.685714012, -19.304), (18.542714012, -20.447), (19.685714012, -21.59))
            Line((19.685714012, -21.59), (20.193714012, -21.59))
            ThreePointArc((20.193714012, -21.59), (21.908214012, -23.3045), (20.193714012, -25.019))
            Line((20.193714012, -25.019), (9.144, -25.019))
            Line((9.144, -25.019), (-9.144, -25.019))
            ThreePointArc((-9.144, -25.019), (-12.95529084, -24.186846855), (-16.072885779, -21.841848236))
            Line((-16.072885779, -21.841848236), (-18.512428595, -19.008976867))
            ThreePointArc((-18.512428595, -19.008976867), (-23.900496356, -18.997748014), (-23.134360122, -24.331080514))
            Line((-23.134360122, -24.331080514), (-24.810009763, -26.943346261))
            Line((-24.810009763, -26.943346261), (-19.061950135, -26.943346261))
        make_face()
    extrude(amount=BOSS_EXTRUDE3_DEPTH)


solid = Compound([cut_extrude1_piece_1.part, cut_extrude1_piece_2.part, body_3.part, body_4.part])
